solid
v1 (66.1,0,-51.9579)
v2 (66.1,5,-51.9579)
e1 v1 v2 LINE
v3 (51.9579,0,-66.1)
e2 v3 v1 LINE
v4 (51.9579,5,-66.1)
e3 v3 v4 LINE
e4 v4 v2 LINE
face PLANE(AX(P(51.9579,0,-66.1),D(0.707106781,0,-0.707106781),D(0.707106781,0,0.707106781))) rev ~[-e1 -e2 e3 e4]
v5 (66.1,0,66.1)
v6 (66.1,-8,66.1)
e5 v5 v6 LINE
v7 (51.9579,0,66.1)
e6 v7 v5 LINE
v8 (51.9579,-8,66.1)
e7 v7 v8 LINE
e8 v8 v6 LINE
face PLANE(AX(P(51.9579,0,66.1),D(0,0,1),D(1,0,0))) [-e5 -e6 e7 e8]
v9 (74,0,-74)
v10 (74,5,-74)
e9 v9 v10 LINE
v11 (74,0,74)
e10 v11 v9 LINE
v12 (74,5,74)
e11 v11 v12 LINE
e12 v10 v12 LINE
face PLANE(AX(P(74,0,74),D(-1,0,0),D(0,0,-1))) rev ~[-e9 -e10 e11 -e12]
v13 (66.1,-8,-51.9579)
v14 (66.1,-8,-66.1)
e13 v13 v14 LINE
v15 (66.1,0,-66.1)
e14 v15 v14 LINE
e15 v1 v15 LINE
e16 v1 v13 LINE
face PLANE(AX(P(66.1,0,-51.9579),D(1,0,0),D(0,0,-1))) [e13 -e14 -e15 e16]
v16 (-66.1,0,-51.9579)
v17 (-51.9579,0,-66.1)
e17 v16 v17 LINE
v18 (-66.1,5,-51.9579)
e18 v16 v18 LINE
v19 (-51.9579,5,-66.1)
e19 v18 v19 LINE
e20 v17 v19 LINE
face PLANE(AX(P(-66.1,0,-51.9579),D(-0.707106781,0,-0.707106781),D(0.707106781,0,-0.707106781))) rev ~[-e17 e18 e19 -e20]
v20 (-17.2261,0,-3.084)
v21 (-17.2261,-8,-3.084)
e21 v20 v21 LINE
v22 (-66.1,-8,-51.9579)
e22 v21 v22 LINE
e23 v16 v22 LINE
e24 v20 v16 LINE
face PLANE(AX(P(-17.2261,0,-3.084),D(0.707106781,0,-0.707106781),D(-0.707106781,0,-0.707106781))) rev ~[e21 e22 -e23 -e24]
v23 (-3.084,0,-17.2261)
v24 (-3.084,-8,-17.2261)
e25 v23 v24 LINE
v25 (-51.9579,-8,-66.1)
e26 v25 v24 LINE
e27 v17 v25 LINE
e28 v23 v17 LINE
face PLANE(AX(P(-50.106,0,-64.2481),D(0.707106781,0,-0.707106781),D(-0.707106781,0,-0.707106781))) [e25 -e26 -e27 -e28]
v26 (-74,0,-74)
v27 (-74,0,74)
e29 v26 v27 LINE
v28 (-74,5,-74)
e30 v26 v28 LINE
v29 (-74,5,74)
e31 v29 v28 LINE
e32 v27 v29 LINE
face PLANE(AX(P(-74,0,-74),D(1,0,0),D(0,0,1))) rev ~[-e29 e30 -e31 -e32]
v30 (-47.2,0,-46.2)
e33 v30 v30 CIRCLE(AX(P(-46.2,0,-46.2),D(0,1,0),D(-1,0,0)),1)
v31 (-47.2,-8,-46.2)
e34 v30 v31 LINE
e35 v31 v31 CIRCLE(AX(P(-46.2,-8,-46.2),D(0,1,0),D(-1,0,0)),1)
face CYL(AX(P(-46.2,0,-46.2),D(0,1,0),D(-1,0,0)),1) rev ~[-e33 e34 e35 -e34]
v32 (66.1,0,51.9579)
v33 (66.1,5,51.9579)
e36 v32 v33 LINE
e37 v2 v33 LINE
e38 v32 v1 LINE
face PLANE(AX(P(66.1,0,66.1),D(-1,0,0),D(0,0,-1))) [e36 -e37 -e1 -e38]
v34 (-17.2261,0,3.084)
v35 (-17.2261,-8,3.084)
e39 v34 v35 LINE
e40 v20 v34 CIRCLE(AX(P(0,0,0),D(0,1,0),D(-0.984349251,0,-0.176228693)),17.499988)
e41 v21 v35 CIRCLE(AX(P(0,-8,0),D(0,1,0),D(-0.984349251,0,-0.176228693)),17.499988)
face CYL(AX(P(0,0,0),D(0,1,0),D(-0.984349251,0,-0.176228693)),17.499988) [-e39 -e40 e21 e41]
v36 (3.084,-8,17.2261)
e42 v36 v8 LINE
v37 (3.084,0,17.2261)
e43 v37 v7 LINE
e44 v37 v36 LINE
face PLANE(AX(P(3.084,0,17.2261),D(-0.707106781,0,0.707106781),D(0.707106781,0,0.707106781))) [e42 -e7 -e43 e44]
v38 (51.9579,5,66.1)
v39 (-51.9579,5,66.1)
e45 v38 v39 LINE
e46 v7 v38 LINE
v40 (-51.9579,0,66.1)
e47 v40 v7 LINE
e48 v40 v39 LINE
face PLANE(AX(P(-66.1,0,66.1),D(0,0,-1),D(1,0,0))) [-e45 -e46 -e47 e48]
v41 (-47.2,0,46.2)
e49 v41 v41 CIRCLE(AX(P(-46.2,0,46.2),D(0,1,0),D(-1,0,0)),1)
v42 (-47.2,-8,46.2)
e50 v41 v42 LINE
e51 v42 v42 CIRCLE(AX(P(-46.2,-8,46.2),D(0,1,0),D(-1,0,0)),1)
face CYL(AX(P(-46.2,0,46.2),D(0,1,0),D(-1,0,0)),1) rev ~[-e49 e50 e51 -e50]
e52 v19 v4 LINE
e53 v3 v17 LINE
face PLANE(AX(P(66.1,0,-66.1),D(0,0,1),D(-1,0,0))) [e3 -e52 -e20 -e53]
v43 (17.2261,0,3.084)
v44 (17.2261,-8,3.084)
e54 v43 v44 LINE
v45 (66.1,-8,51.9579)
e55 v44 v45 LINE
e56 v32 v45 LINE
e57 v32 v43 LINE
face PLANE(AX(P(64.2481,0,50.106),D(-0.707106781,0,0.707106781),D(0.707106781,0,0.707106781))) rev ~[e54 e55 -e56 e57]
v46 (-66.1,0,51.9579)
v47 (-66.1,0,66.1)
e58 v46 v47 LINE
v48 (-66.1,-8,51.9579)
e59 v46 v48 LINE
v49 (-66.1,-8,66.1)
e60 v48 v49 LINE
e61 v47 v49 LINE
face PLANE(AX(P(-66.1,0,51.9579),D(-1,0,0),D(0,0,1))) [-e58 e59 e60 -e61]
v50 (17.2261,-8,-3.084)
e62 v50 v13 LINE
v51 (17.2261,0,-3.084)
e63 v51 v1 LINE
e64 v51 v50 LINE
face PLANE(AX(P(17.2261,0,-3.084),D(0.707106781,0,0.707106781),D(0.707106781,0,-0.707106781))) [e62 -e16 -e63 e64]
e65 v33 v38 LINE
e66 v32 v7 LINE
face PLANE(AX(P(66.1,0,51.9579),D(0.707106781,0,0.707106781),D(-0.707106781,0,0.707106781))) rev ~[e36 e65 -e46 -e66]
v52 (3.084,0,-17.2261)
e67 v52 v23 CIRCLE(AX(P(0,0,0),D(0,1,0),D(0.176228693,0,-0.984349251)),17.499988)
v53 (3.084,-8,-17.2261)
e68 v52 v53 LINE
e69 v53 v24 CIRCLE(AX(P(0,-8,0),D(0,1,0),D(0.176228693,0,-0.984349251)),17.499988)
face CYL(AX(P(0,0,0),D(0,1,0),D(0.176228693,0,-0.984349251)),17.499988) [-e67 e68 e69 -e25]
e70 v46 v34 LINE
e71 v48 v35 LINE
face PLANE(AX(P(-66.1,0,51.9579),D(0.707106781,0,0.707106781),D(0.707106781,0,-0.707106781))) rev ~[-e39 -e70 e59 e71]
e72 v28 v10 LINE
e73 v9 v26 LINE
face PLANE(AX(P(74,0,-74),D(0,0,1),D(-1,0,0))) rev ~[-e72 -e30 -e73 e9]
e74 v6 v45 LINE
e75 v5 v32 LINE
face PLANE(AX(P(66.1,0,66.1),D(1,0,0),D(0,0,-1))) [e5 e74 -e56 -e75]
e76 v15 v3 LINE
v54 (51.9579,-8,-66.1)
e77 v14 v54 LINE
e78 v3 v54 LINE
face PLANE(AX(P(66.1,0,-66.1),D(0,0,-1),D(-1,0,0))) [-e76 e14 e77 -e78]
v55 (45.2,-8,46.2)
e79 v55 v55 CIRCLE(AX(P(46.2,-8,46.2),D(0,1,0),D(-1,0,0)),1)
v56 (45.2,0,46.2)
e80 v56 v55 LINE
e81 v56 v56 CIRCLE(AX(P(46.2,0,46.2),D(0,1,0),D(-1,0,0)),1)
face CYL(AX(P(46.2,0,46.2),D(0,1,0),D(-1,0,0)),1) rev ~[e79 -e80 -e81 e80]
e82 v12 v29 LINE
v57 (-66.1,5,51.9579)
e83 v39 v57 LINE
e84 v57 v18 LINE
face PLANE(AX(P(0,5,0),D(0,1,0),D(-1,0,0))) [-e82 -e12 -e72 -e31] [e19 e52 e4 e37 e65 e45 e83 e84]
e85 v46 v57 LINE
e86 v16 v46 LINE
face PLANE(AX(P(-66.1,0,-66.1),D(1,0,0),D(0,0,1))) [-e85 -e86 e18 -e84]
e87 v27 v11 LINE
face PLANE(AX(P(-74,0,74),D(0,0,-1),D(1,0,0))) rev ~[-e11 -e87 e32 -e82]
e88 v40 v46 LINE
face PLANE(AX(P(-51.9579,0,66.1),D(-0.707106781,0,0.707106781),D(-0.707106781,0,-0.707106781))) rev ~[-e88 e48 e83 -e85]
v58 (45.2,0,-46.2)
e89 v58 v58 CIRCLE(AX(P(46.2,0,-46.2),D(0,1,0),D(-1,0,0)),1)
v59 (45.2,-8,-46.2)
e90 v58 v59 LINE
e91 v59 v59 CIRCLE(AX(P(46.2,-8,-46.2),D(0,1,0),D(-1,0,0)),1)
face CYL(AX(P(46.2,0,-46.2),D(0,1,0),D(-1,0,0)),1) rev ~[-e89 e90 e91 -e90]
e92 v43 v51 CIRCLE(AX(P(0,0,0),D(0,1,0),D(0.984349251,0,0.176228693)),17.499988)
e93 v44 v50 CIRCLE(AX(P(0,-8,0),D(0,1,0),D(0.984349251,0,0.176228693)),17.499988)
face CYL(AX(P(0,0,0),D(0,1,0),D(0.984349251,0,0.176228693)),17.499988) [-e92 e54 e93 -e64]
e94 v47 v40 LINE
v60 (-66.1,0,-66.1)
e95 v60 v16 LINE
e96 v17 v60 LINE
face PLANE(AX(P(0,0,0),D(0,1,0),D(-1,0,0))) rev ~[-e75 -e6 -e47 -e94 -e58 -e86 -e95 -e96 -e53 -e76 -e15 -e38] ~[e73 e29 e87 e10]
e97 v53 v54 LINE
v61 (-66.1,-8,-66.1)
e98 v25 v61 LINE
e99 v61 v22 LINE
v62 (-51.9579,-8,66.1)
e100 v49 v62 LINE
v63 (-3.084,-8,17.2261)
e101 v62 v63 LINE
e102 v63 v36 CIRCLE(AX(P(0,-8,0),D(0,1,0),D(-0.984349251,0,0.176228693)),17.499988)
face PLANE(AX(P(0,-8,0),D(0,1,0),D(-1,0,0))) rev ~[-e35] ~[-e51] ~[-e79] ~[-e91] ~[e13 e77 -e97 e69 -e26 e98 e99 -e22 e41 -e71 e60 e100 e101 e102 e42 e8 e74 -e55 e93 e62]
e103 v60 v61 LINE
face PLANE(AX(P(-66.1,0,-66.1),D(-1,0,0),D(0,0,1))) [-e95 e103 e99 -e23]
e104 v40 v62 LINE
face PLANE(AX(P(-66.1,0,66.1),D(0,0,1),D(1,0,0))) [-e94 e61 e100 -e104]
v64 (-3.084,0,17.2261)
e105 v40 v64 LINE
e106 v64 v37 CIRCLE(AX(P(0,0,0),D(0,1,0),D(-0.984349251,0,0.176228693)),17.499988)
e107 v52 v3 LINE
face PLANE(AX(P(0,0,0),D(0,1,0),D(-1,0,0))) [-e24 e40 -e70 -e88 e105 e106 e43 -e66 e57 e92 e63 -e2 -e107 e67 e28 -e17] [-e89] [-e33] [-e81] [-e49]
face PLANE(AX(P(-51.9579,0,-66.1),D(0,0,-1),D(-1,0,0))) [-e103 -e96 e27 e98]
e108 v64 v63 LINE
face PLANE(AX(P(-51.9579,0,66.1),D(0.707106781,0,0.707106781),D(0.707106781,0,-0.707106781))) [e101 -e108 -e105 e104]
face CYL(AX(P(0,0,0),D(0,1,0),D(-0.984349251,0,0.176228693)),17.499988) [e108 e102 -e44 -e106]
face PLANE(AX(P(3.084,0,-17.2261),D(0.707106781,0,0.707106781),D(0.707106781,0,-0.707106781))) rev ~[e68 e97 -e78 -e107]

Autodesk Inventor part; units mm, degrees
ref_plane "YZ Plane" through (0, 0, 0) normal (1, 0, 0) x (0, 1, 0)
ref_plane "XZ Plane" through (0, 0, 0) normal (0, 1, 0) x (-1, 0, 0)
ref_plane "XY Plane" through (0, 0, 0) normal (0, 0, 1) x (1, 0, 0)
sketch "Sketch1" plane through (0, 0, 0) normal (0, 1, 0) x (-1, 0, 0)
  line L0 (-81.5, 81.5) -> (81.5, -81.5) construction
  line L1 (-81.5, -81.5) -> (81.5, 81.5) construction
  line L2 (-66.3, 66.3) -> (66.3, -66.3) construction
  line L3 (-66.3, -66.3) -> (66.3, 66.3) construction
  line L4 (-81.9, 81.9) -> (-81.9, -81.9)
  line L5 (-81.9, -81.9) -> (81.9, -81.9)
  line L6 (81.9, -81.9) -> (81.9, 81.9)
  line L7 (81.9, 81.9) -> (-81.9, 81.9)
  line L8 (-66.1, 66.1) -> (-66.1, -66.1)
  line L9 (-66.1, -66.1) -> (66.1, -66.1)
  line L10 (66.1, -66.1) -> (66.1, 66.1)
  line L11 (66.1, 66.1) -> (-66.1, 66.1)
  line L12 (-66.1, 66.1) -> (66.1, -66.1) construction
  line L13 (-66.1, -66.1) -> (66.1, 66.1) construction
  line L14 (66.1, 51.9579) -> (17.2261, 3.084)
  line L15 (51.9579, 66.1) -> (3.084, 17.2261)
  line L16 (66.1, -51.9579) -> (14.1421, 0) construction
  line L17 (50.106, -64.2481) -> (3.084, -17.2261)
  arc A0 (-17.2261, -3.084) -> (-3.084, -17.2261) centre (0, 0) ccw
  arc A1 (-17.2261, 3.084) -> (-17.2261, -3.084) centre (0, 0) ccw
  line L18 (-14.1421, 0) -> (-17.2261, -3.084) construction
  line L19 (-3.084, 17.2261) -> (-51.9579, 66.1)
  line L20 (3.084, 17.2261) -> (0, 14.1421) construction
  line L21 (0, 14.1421) -> (-14.1421, 0) construction
  line L22 (14.1421, 0) -> (-3.084, 17.2261) construction
  arc A2 (17.2261, 3.084) -> (-17.2261, 3.084) centre (0, 0) ccw
  arc A3 (17.2261, -3.084) -> (17.2261, 3.084) centre (0, 0) ccw
  arc A4 (-3.084, -17.2261) -> (17.2261, -3.084) centre (0, 0) ccw
  line L23 (3.084, -17.2261) -> (0, -14.1421) construction
  line L24 (0, -14.1421) -> (-14.1421, 0) construction
  line L25 (17.2261, 3.084) -> (-3.084, -17.2261) construction
  line L26 (-3.084, -17.2261) -> (-51.9579, -66.1)
  line L27 (-17.2261, -3.084) -> (-66.1, -51.9579)
  line L28 (-17.2261, 3.084) -> (-64.2481, 50.106)
  line L29 (-14.1421, 0) -> (-17.2261, 3.084) construction
  line L30 (17.2261, -3.084) -> (66.1, -51.9579)
  line L31 (50.106, -64.2481) -> (51.9579, -66.1)
  line L32 (-64.2481, 50.106) -> (-66.1, 51.9579)
  line L33 (46.2, 46.2) -> (-46.2, 46.2) construction
  line L34 (-46.2, 46.2) -> (-46.2, -46.2) construction
  line L35 (-46.2, -46.2) -> (46.2, -46.2) construction
  line L36 (46.2, -46.2) -> (46.2, 46.2) construction
  line L37 (46.2, 46.2) -> (-46.2, -46.2) construction
  line L38 (-46.2, 46.2) -> (46.2, -46.2) construction
  circle A5 centre (46.2, -46.2) radius 1
  circle A6 centre (-46.2, -46.2) radius 1
  circle A7 centre (-46.2, 46.2) radius 1
  circle A8 centre (46.2, 46.2) radius 1
  line L39 (51.9579, 66.1) -> (66.1, 51.9579)
  line L40 (66.1, -51.9579) -> (51.9579, -66.1)
  line L41 (-51.9579, -66.1) -> (-66.1, -51.9579)
  line L42 (-66.1, 51.9579) -> (-51.9579, 66.1)
  line L43 (-74, 74) -> (-74, -74)
  line L44 (-74, -74) -> (74, -74)
  line L45 (74, -74) -> (74, 74)
  line L46 (74, 74) -> (-74, 74)
  line L47 (-74, 74) -> (74, -74) construction
  line L48 (-74, -74) -> (74, 74) construction
  dimension "d0" = 163
  dimension "d1" = 163
  dimension "d2" = 132.6
  dimension "d3" = 132.6
  dimension "d5" = 163.8
  dimension "d6" = 163.8
  dimension "d7" = 132.2
  dimension "d8" = 132.2
  dimension "d9" = 20
  dimension "d10" = 20
  dimension "d11" = 35
  dimension "d12" = 92.4
  dimension "d13" = 92.4
  dimension "d14" = 2
  dimension "d15" = 2
  dimension "d16" = 2
  dimension "d17" = 2
  dimension "d28" = 148
  dimension "d29" = 148
extrude "Extrusion1" add sketch "Sketch1" along normal blind 5 contours L7 L6 L5 L4 | L46 L45 L44 L43
extrude "Extrusion2" add sketch "Sketch1" along normal blind 5 contours L11 L42 L8 | L41 L9 L8 | L11 L10 L39 | L40 L10 L9
extrude "Extrusion4" cut sketch "Sketch1" against normal blind 10 contours L11 L42 L8 | L42 L19 A2 L28 L32 | L41 L9 L8 | L27 A0 L26 L41 | L39 L14 A2 L15 | L11 L10 L39 | A2 A3 A4 A0 A1 | L40 L10 L9 | L31 L17 A4 L30 L40 | A7
extrude "Extrusion5" add sketch "Sketch1" against normal blind 8 contours L11 L42 L8 | L42 L19 A2 L28 L32 | L41 L9 L8 | L27 A0 L26 L41 | L39 L14 A2 L15 | L11 L10 L39 | A2 A3 A4 A0 A1 | L40 L10 L9 | L31 L17 A4 L30 L40
extrude "Extrusion6" cut sketch "Sketch1" along normal blind 8 contours L7 L6 L5 L4
properties part number "Lifting Motor Platform"
